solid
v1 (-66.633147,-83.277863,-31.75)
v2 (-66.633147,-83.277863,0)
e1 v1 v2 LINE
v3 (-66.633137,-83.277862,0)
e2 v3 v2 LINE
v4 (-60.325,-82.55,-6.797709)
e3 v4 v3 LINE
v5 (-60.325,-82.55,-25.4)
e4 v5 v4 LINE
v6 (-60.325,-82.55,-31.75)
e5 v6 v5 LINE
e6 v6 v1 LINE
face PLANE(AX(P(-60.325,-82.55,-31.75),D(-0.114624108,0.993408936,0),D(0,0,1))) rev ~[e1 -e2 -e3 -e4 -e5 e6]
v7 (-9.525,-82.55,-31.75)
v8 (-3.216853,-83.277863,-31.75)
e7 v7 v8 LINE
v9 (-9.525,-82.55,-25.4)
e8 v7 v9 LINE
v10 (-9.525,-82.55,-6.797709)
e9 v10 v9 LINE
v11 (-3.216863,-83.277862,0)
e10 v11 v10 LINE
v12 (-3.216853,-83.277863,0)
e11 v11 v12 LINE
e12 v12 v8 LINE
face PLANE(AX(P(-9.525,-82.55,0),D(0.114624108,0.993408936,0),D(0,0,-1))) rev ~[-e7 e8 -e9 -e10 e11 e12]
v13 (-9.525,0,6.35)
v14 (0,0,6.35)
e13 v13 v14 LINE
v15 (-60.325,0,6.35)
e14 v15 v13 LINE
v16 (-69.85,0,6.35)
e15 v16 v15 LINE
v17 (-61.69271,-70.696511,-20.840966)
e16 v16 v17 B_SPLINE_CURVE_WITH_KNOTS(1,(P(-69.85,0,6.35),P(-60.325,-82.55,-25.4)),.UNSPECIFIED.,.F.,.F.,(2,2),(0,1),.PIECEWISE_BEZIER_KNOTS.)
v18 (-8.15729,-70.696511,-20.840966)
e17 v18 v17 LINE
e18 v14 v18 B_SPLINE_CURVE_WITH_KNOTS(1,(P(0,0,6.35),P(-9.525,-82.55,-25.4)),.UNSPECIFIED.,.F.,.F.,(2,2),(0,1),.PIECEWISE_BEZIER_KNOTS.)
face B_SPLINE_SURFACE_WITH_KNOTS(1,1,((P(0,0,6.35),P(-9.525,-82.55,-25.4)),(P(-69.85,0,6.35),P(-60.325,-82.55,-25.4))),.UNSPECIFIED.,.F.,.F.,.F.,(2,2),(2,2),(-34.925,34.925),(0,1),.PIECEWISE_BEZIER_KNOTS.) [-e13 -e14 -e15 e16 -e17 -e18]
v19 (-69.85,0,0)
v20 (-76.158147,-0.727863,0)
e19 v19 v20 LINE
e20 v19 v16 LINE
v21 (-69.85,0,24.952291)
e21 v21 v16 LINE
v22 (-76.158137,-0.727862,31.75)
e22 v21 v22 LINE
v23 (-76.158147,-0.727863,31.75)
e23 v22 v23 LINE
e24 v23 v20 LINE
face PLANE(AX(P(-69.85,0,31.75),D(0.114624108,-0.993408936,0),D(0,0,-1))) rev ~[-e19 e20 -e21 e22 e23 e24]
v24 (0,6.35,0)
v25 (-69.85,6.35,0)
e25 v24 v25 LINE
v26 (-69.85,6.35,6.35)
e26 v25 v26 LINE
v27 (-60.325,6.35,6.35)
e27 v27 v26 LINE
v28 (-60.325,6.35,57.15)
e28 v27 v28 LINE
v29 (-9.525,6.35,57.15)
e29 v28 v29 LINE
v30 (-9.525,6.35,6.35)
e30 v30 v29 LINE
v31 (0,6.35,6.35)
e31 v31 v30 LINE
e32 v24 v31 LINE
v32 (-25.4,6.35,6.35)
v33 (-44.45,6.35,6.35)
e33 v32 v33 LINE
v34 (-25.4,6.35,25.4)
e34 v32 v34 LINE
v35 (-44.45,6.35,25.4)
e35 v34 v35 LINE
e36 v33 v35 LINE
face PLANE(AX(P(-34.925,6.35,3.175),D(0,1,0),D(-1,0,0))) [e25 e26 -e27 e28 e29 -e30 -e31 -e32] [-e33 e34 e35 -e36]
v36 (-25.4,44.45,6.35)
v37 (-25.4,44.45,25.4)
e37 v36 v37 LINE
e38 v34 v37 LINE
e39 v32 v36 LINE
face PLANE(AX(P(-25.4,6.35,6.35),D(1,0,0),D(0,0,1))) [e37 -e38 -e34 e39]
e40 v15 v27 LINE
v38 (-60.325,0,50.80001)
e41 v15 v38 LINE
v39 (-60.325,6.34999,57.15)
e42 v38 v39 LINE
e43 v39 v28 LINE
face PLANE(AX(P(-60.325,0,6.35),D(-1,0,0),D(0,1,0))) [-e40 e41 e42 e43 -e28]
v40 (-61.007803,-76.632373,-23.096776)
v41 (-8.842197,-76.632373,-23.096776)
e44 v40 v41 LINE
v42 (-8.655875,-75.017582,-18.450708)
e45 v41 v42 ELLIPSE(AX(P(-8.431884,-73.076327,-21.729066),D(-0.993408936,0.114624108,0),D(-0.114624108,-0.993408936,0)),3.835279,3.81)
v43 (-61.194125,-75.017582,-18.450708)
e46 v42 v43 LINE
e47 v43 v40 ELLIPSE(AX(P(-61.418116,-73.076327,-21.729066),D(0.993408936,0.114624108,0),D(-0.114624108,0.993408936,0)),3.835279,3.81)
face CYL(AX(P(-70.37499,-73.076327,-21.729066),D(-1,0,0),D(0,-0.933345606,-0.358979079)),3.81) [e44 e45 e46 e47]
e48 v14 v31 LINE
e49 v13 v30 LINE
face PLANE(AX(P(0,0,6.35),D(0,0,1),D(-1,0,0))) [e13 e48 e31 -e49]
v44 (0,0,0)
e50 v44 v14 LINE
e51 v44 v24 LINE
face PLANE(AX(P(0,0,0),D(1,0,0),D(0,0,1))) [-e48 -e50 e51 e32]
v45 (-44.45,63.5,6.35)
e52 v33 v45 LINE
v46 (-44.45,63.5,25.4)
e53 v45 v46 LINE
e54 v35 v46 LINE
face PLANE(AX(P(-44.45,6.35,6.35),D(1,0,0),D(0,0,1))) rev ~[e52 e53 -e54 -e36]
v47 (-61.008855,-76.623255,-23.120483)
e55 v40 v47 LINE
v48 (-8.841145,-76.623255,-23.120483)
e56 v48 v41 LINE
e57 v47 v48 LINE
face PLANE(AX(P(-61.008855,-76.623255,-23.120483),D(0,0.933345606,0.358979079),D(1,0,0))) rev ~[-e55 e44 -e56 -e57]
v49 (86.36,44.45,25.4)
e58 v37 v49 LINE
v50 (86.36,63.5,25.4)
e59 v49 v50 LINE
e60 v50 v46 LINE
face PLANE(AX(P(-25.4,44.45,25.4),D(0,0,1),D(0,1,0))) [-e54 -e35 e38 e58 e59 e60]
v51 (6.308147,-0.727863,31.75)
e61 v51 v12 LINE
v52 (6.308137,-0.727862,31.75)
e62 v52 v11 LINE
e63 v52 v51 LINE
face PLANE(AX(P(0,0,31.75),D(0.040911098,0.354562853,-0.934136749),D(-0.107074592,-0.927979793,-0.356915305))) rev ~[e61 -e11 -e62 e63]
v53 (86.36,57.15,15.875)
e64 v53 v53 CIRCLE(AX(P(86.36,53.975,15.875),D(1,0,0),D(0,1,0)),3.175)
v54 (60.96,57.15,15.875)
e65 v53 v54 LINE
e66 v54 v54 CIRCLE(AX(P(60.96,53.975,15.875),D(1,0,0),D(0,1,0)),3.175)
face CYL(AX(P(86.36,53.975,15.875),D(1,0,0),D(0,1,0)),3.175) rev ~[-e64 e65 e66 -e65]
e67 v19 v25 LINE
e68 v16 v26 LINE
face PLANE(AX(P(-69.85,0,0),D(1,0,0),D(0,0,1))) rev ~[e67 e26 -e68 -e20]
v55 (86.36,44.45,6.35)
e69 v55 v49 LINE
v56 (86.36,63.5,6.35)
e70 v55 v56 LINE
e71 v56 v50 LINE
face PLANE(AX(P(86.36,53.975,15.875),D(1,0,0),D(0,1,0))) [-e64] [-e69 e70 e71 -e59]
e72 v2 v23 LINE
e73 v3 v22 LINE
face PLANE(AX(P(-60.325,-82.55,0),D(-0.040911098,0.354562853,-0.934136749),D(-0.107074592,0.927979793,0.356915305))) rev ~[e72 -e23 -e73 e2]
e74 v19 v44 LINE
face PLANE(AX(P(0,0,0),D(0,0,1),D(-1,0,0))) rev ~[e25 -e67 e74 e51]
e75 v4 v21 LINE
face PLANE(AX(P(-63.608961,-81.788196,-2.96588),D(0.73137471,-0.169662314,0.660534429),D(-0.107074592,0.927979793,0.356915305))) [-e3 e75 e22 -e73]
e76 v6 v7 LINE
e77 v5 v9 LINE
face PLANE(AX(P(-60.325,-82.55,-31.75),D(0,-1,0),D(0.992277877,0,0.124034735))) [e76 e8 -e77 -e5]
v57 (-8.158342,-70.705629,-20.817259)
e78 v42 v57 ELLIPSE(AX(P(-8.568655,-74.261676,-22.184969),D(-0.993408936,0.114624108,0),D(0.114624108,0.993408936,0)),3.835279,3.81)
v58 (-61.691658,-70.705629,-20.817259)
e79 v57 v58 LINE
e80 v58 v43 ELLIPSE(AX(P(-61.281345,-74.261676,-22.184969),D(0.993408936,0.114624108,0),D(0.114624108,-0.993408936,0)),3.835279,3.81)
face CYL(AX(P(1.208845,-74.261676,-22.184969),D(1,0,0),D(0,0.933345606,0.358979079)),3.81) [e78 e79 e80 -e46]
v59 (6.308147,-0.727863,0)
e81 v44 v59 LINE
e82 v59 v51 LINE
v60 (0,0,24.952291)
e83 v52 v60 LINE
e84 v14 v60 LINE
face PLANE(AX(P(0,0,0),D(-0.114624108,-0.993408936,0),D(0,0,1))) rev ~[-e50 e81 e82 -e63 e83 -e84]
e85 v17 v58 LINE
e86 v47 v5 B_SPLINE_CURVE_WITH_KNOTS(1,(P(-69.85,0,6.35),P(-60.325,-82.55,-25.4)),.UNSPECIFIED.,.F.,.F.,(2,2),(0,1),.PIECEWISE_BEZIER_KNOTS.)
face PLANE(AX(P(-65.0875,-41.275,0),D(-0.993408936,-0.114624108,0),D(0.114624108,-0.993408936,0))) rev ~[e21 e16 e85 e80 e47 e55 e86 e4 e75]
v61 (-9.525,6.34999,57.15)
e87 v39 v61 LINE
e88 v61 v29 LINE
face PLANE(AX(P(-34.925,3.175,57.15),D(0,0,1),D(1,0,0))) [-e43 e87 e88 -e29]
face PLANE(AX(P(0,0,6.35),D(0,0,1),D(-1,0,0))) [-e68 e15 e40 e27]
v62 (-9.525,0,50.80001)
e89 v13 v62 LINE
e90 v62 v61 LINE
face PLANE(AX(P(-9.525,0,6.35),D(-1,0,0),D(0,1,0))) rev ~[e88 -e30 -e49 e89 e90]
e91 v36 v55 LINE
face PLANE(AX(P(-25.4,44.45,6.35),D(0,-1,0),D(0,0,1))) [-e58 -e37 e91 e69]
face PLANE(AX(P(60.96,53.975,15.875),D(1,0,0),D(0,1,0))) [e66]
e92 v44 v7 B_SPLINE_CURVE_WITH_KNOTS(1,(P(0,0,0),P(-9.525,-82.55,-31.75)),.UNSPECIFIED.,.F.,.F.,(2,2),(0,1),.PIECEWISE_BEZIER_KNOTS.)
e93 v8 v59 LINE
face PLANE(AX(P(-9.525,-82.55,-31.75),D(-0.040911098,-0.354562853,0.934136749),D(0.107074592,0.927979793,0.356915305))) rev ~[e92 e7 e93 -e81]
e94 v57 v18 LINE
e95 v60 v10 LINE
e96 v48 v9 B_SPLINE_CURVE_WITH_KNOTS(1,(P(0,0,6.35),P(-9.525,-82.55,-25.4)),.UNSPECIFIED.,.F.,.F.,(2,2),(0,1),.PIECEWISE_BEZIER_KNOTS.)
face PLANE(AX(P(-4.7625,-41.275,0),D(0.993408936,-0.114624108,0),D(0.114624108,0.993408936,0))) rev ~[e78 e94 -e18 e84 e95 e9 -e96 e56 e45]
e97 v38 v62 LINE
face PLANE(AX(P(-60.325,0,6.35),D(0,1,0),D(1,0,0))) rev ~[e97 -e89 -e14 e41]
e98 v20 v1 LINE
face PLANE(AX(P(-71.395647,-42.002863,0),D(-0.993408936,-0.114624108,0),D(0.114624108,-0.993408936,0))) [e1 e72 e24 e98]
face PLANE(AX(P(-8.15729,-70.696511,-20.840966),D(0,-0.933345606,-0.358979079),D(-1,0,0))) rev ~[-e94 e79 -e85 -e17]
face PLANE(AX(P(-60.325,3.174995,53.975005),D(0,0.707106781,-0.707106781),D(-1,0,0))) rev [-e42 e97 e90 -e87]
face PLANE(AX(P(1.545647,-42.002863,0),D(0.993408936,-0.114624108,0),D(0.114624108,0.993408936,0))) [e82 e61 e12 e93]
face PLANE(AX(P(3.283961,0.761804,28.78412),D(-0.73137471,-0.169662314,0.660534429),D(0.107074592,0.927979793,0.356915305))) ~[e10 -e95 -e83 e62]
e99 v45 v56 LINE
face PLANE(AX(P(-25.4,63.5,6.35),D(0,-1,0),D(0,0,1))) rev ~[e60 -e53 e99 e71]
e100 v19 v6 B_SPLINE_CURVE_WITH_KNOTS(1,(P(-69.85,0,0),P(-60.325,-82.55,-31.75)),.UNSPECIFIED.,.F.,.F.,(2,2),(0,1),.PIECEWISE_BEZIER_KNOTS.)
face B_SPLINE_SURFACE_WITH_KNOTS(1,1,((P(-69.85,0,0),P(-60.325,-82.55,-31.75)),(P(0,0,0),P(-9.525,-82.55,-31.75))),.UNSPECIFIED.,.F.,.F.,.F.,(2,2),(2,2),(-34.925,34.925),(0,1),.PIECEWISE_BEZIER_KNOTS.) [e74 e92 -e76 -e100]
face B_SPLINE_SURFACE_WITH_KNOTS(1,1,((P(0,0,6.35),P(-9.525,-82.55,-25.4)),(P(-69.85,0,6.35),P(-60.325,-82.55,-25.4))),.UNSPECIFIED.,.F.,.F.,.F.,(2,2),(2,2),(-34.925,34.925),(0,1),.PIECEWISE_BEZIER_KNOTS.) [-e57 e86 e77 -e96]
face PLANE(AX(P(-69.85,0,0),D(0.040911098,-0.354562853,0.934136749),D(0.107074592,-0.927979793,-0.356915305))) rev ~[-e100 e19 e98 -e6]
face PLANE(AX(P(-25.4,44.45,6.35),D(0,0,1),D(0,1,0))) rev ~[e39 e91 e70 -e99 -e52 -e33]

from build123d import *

# Parameters (mm, degrees)
F0_W          = 69.85
F0_H          = 6.35
F2_W          = 50.8
F2_H          = 6.35
F5_DEPTH      = 6.35
F7_DEPTH      = 6.35
F9_DEPTH      = 3.8354
F10_T4_DEPTH  = 70.8999806704
F10_T10_DEPTH = 72.2676909626
F11_W         = 69.85
F11_H         = 6.35
F12_DEPTH     = 6.35
F13_W         = 50.8
F13_H         = 6.35
F14_DEPTH     = 50.8
F15_SIZE      = 6.34999
F16_W         = 19.05
F16_H         = 19.05
F17_DEPTH     = 57.15
F18_W         = 19.05
F18_H         = 19.05
F19_DEPTH     = 111.76
F20_SIZE      = 6.34999
F21_R         = 3.175
F22_DEPTH     = 25.4


# Not quite as in the source:
# - a fillet or chamfer that OpenCascade refuses, or shapes differently, is made with other operations: its cross-section is extruded or revolved along the edge and cut away or added
# - a fillet or chamfer is up to 0.001 mm smaller than in the source, because OpenCascade refuses the exact size


with BuildPart() as f3:
    # F0 (on Front) → F3 section 0
    with BuildSketch(Plane.XZ):
        with Locations((-34.925, 3.175)):
            Rectangle(F0_W, F0_H)
    # F2 (on offset) → F3 section 1
    with BuildSketch(Plane.XZ.offset(82.55)):
        with Locations((-34.925, -28.575)):
            Rectangle(F2_W, F2_H)
    loft()

    # F4 (on face) → F5 (join)
    with BuildSketch(Plane(origin=(-68.9322627737, -7.9537226277, 0), x_dir=(0.114624108, -0.9934089359, 0), z_dir=(-0.9934089359, -0.114624108, 0))):
        Polygon((-8.0064939428, 31.75), (-8.0064939428, 6.35), (-8.0064939428, 0), (75.091208342, -31.75), (75.091208342, -25.4), (75.091208342, 0), align=None)
    extrude(amount=F5_DEPTH)

    # F6 (on face) → F7 (join)
    with BuildSketch(Plane(origin=(0, 0, 0), x_dir=(0.114624108, 0.9934089359, 0), z_dir=(0.9934089359, -0.114624108, 0))):
        Polygon((-83.0977022847, 0), (-83.0977022847, -31.75), (0, 0), (0, 31.75), align=None)
    extrude(amount=F7_DEPTH)

    # F8 (on face) → F9 (join)
    with BuildSketch(Plane(origin=(0, -2.1275773196, 5.5317010309), x_dir=(1, 0, 0), z_dir=(0, -0.3589790793, 0.9333456062))):
        Polygon((-61.6927102922, -73.4657484065), (-61.0088551461, -79.8157484065), (-8.8411448539, -79.8157484065), (-8.1572897078, -73.4657484065), align=None)
    extrude(amount=F9_DEPTH)

    # F10: fillet of radius 3.81 on 2 edges, made by hand


with BuildPart() as f10_tool2:
    # F10_s3 → F10_t4 (new body)
    with BuildSketch(Plane.YZ.offset(-70.3749903352)):
        with BuildLine():
            ThreePointArc((-76.6323734692, -23.096775868), (-76.5579487098, -20.1816780202), (-74.4440370018, -18.1730188162))
            Line((-74.4440370018, -18.1730188162), (-78.0000837614, -19.5407291084))
            Line((-78.0000837614, -19.5407291084), (-76.6323734692, -23.096775868))
        make_face()
    extrude(amount=F10_T4_DEPTH)

    split(bisect_by=Plane(origin=(0, 0, 0), x_dir=(0, 0, 1), z_dir=(-0.9934089359, 0.114624108, 0)), keep=Keep.TOP)

    split(bisect_by=Plane(origin=(-68.9322627737, -7.9537226277, 0), x_dir=(0, 0, 1), z_dir=(0.9934089359, 0.114624108, 0)), keep=Keep.TOP)


with BuildPart() as f3_1:
    add(f3.part)

    # F10_t1: cut F10_tool2
    add(f10_tool2.part, mode=Mode.SUBTRACT)


with BuildPart() as f10_tool8:
    # F10_s9 → F10_t10 (new body)
    with BuildSketch(Plane.YZ.offset(1.2088454813)):
        with BuildLine():
            ThreePointArc((-70.7056288698, -20.8172587144), (-72.7142880738, -18.7033470063), (-75.6293859216, -18.6289222469))
            Line((-75.6293859216, -18.6289222469), (-72.073339162, -17.2612119547))
            Line((-72.073339162, -17.2612119547), (-70.7056288698, -20.8172587144))
        make_face()
    extrude(amount=-F10_T10_DEPTH)

    split(bisect_by=Plane(origin=(0, 0, 0), x_dir=(0, 0, 1), z_dir=(-0.9934089359, 0.114624108, 0)), keep=Keep.TOP)

    split(bisect_by=Plane(origin=(-68.9322627737, -7.9537226277, 0), x_dir=(0, 0, 1), z_dir=(0.9934089359, 0.114624108, 0)), keep=Keep.TOP)


with BuildPart() as f3_2:
    add(f3_1.part)

    # F10_t7: cut F10_tool8
    add(f10_tool8.part, mode=Mode.SUBTRACT)

    # F11 (on face) → F12 (join)
    with BuildSketch(Plane(origin=(0, 0, 0), x_dir=(-1, 0, 0), z_dir=(0, 1, 0))):
        with Locations((34.925, 3.175)):
            Rectangle(F11_W, F11_H)
    extrude(amount=F12_DEPTH)

    # F13 (on face) → F14 (join)
    with BuildSketch(Plane.XY.offset(6.35)):
        with Locations((-34.925, 3.175)):
            Rectangle(F13_W, F13_H)
    extrude(amount=F14_DEPTH)

    # F15 (size 6.35 in the source; OpenCascade refuses exactly that, so slightly less here)
    f15_edges = [f3_2.edges().sort_by_distance(p)[0] for p in [
        (-34.925, 0, 57.15),
    ]]
    chamfer(f15_edges, length=F15_SIZE)

    # F16 (on face) → F17 (join)
    with BuildSketch(Plane(origin=(0, 6.35, 0), x_dir=(-1, 0, 0), z_dir=(0, 1, 0))):
        with Locations((34.925, 15.875)):
            Rectangle(F16_W, F16_H)
    extrude(amount=F17_DEPTH)

    # F18 (on face) → F19 (join)
    with BuildSketch(Plane.YZ.offset(-25.4)):
        with Locations((53.975, 15.875)):
            Rectangle(F18_W, F18_H)
    extrude(amount=F19_DEPTH)

    # F20 (size 6.35 in the source; OpenCascade refuses exactly that, so slightly less here)
    f20_edges = [f3_2.edges().sort_by_distance(p)[0] for p in [
        (-65.0875, -41.275, 15.875),
        (-4.7625, -41.275, 15.875),
    ]]
    chamfer(f20_edges, length=F20_SIZE)

    # F21 (on face) → F22 (cut)
    with BuildSketch(Plane.YZ.offset(86.36)):
        with Locations((53.975, 15.875)):
            Circle(F21_R)
    extrude(amount=-F22_DEPTH, mode=Mode.SUBTRACT)


solid = f3_2.part
